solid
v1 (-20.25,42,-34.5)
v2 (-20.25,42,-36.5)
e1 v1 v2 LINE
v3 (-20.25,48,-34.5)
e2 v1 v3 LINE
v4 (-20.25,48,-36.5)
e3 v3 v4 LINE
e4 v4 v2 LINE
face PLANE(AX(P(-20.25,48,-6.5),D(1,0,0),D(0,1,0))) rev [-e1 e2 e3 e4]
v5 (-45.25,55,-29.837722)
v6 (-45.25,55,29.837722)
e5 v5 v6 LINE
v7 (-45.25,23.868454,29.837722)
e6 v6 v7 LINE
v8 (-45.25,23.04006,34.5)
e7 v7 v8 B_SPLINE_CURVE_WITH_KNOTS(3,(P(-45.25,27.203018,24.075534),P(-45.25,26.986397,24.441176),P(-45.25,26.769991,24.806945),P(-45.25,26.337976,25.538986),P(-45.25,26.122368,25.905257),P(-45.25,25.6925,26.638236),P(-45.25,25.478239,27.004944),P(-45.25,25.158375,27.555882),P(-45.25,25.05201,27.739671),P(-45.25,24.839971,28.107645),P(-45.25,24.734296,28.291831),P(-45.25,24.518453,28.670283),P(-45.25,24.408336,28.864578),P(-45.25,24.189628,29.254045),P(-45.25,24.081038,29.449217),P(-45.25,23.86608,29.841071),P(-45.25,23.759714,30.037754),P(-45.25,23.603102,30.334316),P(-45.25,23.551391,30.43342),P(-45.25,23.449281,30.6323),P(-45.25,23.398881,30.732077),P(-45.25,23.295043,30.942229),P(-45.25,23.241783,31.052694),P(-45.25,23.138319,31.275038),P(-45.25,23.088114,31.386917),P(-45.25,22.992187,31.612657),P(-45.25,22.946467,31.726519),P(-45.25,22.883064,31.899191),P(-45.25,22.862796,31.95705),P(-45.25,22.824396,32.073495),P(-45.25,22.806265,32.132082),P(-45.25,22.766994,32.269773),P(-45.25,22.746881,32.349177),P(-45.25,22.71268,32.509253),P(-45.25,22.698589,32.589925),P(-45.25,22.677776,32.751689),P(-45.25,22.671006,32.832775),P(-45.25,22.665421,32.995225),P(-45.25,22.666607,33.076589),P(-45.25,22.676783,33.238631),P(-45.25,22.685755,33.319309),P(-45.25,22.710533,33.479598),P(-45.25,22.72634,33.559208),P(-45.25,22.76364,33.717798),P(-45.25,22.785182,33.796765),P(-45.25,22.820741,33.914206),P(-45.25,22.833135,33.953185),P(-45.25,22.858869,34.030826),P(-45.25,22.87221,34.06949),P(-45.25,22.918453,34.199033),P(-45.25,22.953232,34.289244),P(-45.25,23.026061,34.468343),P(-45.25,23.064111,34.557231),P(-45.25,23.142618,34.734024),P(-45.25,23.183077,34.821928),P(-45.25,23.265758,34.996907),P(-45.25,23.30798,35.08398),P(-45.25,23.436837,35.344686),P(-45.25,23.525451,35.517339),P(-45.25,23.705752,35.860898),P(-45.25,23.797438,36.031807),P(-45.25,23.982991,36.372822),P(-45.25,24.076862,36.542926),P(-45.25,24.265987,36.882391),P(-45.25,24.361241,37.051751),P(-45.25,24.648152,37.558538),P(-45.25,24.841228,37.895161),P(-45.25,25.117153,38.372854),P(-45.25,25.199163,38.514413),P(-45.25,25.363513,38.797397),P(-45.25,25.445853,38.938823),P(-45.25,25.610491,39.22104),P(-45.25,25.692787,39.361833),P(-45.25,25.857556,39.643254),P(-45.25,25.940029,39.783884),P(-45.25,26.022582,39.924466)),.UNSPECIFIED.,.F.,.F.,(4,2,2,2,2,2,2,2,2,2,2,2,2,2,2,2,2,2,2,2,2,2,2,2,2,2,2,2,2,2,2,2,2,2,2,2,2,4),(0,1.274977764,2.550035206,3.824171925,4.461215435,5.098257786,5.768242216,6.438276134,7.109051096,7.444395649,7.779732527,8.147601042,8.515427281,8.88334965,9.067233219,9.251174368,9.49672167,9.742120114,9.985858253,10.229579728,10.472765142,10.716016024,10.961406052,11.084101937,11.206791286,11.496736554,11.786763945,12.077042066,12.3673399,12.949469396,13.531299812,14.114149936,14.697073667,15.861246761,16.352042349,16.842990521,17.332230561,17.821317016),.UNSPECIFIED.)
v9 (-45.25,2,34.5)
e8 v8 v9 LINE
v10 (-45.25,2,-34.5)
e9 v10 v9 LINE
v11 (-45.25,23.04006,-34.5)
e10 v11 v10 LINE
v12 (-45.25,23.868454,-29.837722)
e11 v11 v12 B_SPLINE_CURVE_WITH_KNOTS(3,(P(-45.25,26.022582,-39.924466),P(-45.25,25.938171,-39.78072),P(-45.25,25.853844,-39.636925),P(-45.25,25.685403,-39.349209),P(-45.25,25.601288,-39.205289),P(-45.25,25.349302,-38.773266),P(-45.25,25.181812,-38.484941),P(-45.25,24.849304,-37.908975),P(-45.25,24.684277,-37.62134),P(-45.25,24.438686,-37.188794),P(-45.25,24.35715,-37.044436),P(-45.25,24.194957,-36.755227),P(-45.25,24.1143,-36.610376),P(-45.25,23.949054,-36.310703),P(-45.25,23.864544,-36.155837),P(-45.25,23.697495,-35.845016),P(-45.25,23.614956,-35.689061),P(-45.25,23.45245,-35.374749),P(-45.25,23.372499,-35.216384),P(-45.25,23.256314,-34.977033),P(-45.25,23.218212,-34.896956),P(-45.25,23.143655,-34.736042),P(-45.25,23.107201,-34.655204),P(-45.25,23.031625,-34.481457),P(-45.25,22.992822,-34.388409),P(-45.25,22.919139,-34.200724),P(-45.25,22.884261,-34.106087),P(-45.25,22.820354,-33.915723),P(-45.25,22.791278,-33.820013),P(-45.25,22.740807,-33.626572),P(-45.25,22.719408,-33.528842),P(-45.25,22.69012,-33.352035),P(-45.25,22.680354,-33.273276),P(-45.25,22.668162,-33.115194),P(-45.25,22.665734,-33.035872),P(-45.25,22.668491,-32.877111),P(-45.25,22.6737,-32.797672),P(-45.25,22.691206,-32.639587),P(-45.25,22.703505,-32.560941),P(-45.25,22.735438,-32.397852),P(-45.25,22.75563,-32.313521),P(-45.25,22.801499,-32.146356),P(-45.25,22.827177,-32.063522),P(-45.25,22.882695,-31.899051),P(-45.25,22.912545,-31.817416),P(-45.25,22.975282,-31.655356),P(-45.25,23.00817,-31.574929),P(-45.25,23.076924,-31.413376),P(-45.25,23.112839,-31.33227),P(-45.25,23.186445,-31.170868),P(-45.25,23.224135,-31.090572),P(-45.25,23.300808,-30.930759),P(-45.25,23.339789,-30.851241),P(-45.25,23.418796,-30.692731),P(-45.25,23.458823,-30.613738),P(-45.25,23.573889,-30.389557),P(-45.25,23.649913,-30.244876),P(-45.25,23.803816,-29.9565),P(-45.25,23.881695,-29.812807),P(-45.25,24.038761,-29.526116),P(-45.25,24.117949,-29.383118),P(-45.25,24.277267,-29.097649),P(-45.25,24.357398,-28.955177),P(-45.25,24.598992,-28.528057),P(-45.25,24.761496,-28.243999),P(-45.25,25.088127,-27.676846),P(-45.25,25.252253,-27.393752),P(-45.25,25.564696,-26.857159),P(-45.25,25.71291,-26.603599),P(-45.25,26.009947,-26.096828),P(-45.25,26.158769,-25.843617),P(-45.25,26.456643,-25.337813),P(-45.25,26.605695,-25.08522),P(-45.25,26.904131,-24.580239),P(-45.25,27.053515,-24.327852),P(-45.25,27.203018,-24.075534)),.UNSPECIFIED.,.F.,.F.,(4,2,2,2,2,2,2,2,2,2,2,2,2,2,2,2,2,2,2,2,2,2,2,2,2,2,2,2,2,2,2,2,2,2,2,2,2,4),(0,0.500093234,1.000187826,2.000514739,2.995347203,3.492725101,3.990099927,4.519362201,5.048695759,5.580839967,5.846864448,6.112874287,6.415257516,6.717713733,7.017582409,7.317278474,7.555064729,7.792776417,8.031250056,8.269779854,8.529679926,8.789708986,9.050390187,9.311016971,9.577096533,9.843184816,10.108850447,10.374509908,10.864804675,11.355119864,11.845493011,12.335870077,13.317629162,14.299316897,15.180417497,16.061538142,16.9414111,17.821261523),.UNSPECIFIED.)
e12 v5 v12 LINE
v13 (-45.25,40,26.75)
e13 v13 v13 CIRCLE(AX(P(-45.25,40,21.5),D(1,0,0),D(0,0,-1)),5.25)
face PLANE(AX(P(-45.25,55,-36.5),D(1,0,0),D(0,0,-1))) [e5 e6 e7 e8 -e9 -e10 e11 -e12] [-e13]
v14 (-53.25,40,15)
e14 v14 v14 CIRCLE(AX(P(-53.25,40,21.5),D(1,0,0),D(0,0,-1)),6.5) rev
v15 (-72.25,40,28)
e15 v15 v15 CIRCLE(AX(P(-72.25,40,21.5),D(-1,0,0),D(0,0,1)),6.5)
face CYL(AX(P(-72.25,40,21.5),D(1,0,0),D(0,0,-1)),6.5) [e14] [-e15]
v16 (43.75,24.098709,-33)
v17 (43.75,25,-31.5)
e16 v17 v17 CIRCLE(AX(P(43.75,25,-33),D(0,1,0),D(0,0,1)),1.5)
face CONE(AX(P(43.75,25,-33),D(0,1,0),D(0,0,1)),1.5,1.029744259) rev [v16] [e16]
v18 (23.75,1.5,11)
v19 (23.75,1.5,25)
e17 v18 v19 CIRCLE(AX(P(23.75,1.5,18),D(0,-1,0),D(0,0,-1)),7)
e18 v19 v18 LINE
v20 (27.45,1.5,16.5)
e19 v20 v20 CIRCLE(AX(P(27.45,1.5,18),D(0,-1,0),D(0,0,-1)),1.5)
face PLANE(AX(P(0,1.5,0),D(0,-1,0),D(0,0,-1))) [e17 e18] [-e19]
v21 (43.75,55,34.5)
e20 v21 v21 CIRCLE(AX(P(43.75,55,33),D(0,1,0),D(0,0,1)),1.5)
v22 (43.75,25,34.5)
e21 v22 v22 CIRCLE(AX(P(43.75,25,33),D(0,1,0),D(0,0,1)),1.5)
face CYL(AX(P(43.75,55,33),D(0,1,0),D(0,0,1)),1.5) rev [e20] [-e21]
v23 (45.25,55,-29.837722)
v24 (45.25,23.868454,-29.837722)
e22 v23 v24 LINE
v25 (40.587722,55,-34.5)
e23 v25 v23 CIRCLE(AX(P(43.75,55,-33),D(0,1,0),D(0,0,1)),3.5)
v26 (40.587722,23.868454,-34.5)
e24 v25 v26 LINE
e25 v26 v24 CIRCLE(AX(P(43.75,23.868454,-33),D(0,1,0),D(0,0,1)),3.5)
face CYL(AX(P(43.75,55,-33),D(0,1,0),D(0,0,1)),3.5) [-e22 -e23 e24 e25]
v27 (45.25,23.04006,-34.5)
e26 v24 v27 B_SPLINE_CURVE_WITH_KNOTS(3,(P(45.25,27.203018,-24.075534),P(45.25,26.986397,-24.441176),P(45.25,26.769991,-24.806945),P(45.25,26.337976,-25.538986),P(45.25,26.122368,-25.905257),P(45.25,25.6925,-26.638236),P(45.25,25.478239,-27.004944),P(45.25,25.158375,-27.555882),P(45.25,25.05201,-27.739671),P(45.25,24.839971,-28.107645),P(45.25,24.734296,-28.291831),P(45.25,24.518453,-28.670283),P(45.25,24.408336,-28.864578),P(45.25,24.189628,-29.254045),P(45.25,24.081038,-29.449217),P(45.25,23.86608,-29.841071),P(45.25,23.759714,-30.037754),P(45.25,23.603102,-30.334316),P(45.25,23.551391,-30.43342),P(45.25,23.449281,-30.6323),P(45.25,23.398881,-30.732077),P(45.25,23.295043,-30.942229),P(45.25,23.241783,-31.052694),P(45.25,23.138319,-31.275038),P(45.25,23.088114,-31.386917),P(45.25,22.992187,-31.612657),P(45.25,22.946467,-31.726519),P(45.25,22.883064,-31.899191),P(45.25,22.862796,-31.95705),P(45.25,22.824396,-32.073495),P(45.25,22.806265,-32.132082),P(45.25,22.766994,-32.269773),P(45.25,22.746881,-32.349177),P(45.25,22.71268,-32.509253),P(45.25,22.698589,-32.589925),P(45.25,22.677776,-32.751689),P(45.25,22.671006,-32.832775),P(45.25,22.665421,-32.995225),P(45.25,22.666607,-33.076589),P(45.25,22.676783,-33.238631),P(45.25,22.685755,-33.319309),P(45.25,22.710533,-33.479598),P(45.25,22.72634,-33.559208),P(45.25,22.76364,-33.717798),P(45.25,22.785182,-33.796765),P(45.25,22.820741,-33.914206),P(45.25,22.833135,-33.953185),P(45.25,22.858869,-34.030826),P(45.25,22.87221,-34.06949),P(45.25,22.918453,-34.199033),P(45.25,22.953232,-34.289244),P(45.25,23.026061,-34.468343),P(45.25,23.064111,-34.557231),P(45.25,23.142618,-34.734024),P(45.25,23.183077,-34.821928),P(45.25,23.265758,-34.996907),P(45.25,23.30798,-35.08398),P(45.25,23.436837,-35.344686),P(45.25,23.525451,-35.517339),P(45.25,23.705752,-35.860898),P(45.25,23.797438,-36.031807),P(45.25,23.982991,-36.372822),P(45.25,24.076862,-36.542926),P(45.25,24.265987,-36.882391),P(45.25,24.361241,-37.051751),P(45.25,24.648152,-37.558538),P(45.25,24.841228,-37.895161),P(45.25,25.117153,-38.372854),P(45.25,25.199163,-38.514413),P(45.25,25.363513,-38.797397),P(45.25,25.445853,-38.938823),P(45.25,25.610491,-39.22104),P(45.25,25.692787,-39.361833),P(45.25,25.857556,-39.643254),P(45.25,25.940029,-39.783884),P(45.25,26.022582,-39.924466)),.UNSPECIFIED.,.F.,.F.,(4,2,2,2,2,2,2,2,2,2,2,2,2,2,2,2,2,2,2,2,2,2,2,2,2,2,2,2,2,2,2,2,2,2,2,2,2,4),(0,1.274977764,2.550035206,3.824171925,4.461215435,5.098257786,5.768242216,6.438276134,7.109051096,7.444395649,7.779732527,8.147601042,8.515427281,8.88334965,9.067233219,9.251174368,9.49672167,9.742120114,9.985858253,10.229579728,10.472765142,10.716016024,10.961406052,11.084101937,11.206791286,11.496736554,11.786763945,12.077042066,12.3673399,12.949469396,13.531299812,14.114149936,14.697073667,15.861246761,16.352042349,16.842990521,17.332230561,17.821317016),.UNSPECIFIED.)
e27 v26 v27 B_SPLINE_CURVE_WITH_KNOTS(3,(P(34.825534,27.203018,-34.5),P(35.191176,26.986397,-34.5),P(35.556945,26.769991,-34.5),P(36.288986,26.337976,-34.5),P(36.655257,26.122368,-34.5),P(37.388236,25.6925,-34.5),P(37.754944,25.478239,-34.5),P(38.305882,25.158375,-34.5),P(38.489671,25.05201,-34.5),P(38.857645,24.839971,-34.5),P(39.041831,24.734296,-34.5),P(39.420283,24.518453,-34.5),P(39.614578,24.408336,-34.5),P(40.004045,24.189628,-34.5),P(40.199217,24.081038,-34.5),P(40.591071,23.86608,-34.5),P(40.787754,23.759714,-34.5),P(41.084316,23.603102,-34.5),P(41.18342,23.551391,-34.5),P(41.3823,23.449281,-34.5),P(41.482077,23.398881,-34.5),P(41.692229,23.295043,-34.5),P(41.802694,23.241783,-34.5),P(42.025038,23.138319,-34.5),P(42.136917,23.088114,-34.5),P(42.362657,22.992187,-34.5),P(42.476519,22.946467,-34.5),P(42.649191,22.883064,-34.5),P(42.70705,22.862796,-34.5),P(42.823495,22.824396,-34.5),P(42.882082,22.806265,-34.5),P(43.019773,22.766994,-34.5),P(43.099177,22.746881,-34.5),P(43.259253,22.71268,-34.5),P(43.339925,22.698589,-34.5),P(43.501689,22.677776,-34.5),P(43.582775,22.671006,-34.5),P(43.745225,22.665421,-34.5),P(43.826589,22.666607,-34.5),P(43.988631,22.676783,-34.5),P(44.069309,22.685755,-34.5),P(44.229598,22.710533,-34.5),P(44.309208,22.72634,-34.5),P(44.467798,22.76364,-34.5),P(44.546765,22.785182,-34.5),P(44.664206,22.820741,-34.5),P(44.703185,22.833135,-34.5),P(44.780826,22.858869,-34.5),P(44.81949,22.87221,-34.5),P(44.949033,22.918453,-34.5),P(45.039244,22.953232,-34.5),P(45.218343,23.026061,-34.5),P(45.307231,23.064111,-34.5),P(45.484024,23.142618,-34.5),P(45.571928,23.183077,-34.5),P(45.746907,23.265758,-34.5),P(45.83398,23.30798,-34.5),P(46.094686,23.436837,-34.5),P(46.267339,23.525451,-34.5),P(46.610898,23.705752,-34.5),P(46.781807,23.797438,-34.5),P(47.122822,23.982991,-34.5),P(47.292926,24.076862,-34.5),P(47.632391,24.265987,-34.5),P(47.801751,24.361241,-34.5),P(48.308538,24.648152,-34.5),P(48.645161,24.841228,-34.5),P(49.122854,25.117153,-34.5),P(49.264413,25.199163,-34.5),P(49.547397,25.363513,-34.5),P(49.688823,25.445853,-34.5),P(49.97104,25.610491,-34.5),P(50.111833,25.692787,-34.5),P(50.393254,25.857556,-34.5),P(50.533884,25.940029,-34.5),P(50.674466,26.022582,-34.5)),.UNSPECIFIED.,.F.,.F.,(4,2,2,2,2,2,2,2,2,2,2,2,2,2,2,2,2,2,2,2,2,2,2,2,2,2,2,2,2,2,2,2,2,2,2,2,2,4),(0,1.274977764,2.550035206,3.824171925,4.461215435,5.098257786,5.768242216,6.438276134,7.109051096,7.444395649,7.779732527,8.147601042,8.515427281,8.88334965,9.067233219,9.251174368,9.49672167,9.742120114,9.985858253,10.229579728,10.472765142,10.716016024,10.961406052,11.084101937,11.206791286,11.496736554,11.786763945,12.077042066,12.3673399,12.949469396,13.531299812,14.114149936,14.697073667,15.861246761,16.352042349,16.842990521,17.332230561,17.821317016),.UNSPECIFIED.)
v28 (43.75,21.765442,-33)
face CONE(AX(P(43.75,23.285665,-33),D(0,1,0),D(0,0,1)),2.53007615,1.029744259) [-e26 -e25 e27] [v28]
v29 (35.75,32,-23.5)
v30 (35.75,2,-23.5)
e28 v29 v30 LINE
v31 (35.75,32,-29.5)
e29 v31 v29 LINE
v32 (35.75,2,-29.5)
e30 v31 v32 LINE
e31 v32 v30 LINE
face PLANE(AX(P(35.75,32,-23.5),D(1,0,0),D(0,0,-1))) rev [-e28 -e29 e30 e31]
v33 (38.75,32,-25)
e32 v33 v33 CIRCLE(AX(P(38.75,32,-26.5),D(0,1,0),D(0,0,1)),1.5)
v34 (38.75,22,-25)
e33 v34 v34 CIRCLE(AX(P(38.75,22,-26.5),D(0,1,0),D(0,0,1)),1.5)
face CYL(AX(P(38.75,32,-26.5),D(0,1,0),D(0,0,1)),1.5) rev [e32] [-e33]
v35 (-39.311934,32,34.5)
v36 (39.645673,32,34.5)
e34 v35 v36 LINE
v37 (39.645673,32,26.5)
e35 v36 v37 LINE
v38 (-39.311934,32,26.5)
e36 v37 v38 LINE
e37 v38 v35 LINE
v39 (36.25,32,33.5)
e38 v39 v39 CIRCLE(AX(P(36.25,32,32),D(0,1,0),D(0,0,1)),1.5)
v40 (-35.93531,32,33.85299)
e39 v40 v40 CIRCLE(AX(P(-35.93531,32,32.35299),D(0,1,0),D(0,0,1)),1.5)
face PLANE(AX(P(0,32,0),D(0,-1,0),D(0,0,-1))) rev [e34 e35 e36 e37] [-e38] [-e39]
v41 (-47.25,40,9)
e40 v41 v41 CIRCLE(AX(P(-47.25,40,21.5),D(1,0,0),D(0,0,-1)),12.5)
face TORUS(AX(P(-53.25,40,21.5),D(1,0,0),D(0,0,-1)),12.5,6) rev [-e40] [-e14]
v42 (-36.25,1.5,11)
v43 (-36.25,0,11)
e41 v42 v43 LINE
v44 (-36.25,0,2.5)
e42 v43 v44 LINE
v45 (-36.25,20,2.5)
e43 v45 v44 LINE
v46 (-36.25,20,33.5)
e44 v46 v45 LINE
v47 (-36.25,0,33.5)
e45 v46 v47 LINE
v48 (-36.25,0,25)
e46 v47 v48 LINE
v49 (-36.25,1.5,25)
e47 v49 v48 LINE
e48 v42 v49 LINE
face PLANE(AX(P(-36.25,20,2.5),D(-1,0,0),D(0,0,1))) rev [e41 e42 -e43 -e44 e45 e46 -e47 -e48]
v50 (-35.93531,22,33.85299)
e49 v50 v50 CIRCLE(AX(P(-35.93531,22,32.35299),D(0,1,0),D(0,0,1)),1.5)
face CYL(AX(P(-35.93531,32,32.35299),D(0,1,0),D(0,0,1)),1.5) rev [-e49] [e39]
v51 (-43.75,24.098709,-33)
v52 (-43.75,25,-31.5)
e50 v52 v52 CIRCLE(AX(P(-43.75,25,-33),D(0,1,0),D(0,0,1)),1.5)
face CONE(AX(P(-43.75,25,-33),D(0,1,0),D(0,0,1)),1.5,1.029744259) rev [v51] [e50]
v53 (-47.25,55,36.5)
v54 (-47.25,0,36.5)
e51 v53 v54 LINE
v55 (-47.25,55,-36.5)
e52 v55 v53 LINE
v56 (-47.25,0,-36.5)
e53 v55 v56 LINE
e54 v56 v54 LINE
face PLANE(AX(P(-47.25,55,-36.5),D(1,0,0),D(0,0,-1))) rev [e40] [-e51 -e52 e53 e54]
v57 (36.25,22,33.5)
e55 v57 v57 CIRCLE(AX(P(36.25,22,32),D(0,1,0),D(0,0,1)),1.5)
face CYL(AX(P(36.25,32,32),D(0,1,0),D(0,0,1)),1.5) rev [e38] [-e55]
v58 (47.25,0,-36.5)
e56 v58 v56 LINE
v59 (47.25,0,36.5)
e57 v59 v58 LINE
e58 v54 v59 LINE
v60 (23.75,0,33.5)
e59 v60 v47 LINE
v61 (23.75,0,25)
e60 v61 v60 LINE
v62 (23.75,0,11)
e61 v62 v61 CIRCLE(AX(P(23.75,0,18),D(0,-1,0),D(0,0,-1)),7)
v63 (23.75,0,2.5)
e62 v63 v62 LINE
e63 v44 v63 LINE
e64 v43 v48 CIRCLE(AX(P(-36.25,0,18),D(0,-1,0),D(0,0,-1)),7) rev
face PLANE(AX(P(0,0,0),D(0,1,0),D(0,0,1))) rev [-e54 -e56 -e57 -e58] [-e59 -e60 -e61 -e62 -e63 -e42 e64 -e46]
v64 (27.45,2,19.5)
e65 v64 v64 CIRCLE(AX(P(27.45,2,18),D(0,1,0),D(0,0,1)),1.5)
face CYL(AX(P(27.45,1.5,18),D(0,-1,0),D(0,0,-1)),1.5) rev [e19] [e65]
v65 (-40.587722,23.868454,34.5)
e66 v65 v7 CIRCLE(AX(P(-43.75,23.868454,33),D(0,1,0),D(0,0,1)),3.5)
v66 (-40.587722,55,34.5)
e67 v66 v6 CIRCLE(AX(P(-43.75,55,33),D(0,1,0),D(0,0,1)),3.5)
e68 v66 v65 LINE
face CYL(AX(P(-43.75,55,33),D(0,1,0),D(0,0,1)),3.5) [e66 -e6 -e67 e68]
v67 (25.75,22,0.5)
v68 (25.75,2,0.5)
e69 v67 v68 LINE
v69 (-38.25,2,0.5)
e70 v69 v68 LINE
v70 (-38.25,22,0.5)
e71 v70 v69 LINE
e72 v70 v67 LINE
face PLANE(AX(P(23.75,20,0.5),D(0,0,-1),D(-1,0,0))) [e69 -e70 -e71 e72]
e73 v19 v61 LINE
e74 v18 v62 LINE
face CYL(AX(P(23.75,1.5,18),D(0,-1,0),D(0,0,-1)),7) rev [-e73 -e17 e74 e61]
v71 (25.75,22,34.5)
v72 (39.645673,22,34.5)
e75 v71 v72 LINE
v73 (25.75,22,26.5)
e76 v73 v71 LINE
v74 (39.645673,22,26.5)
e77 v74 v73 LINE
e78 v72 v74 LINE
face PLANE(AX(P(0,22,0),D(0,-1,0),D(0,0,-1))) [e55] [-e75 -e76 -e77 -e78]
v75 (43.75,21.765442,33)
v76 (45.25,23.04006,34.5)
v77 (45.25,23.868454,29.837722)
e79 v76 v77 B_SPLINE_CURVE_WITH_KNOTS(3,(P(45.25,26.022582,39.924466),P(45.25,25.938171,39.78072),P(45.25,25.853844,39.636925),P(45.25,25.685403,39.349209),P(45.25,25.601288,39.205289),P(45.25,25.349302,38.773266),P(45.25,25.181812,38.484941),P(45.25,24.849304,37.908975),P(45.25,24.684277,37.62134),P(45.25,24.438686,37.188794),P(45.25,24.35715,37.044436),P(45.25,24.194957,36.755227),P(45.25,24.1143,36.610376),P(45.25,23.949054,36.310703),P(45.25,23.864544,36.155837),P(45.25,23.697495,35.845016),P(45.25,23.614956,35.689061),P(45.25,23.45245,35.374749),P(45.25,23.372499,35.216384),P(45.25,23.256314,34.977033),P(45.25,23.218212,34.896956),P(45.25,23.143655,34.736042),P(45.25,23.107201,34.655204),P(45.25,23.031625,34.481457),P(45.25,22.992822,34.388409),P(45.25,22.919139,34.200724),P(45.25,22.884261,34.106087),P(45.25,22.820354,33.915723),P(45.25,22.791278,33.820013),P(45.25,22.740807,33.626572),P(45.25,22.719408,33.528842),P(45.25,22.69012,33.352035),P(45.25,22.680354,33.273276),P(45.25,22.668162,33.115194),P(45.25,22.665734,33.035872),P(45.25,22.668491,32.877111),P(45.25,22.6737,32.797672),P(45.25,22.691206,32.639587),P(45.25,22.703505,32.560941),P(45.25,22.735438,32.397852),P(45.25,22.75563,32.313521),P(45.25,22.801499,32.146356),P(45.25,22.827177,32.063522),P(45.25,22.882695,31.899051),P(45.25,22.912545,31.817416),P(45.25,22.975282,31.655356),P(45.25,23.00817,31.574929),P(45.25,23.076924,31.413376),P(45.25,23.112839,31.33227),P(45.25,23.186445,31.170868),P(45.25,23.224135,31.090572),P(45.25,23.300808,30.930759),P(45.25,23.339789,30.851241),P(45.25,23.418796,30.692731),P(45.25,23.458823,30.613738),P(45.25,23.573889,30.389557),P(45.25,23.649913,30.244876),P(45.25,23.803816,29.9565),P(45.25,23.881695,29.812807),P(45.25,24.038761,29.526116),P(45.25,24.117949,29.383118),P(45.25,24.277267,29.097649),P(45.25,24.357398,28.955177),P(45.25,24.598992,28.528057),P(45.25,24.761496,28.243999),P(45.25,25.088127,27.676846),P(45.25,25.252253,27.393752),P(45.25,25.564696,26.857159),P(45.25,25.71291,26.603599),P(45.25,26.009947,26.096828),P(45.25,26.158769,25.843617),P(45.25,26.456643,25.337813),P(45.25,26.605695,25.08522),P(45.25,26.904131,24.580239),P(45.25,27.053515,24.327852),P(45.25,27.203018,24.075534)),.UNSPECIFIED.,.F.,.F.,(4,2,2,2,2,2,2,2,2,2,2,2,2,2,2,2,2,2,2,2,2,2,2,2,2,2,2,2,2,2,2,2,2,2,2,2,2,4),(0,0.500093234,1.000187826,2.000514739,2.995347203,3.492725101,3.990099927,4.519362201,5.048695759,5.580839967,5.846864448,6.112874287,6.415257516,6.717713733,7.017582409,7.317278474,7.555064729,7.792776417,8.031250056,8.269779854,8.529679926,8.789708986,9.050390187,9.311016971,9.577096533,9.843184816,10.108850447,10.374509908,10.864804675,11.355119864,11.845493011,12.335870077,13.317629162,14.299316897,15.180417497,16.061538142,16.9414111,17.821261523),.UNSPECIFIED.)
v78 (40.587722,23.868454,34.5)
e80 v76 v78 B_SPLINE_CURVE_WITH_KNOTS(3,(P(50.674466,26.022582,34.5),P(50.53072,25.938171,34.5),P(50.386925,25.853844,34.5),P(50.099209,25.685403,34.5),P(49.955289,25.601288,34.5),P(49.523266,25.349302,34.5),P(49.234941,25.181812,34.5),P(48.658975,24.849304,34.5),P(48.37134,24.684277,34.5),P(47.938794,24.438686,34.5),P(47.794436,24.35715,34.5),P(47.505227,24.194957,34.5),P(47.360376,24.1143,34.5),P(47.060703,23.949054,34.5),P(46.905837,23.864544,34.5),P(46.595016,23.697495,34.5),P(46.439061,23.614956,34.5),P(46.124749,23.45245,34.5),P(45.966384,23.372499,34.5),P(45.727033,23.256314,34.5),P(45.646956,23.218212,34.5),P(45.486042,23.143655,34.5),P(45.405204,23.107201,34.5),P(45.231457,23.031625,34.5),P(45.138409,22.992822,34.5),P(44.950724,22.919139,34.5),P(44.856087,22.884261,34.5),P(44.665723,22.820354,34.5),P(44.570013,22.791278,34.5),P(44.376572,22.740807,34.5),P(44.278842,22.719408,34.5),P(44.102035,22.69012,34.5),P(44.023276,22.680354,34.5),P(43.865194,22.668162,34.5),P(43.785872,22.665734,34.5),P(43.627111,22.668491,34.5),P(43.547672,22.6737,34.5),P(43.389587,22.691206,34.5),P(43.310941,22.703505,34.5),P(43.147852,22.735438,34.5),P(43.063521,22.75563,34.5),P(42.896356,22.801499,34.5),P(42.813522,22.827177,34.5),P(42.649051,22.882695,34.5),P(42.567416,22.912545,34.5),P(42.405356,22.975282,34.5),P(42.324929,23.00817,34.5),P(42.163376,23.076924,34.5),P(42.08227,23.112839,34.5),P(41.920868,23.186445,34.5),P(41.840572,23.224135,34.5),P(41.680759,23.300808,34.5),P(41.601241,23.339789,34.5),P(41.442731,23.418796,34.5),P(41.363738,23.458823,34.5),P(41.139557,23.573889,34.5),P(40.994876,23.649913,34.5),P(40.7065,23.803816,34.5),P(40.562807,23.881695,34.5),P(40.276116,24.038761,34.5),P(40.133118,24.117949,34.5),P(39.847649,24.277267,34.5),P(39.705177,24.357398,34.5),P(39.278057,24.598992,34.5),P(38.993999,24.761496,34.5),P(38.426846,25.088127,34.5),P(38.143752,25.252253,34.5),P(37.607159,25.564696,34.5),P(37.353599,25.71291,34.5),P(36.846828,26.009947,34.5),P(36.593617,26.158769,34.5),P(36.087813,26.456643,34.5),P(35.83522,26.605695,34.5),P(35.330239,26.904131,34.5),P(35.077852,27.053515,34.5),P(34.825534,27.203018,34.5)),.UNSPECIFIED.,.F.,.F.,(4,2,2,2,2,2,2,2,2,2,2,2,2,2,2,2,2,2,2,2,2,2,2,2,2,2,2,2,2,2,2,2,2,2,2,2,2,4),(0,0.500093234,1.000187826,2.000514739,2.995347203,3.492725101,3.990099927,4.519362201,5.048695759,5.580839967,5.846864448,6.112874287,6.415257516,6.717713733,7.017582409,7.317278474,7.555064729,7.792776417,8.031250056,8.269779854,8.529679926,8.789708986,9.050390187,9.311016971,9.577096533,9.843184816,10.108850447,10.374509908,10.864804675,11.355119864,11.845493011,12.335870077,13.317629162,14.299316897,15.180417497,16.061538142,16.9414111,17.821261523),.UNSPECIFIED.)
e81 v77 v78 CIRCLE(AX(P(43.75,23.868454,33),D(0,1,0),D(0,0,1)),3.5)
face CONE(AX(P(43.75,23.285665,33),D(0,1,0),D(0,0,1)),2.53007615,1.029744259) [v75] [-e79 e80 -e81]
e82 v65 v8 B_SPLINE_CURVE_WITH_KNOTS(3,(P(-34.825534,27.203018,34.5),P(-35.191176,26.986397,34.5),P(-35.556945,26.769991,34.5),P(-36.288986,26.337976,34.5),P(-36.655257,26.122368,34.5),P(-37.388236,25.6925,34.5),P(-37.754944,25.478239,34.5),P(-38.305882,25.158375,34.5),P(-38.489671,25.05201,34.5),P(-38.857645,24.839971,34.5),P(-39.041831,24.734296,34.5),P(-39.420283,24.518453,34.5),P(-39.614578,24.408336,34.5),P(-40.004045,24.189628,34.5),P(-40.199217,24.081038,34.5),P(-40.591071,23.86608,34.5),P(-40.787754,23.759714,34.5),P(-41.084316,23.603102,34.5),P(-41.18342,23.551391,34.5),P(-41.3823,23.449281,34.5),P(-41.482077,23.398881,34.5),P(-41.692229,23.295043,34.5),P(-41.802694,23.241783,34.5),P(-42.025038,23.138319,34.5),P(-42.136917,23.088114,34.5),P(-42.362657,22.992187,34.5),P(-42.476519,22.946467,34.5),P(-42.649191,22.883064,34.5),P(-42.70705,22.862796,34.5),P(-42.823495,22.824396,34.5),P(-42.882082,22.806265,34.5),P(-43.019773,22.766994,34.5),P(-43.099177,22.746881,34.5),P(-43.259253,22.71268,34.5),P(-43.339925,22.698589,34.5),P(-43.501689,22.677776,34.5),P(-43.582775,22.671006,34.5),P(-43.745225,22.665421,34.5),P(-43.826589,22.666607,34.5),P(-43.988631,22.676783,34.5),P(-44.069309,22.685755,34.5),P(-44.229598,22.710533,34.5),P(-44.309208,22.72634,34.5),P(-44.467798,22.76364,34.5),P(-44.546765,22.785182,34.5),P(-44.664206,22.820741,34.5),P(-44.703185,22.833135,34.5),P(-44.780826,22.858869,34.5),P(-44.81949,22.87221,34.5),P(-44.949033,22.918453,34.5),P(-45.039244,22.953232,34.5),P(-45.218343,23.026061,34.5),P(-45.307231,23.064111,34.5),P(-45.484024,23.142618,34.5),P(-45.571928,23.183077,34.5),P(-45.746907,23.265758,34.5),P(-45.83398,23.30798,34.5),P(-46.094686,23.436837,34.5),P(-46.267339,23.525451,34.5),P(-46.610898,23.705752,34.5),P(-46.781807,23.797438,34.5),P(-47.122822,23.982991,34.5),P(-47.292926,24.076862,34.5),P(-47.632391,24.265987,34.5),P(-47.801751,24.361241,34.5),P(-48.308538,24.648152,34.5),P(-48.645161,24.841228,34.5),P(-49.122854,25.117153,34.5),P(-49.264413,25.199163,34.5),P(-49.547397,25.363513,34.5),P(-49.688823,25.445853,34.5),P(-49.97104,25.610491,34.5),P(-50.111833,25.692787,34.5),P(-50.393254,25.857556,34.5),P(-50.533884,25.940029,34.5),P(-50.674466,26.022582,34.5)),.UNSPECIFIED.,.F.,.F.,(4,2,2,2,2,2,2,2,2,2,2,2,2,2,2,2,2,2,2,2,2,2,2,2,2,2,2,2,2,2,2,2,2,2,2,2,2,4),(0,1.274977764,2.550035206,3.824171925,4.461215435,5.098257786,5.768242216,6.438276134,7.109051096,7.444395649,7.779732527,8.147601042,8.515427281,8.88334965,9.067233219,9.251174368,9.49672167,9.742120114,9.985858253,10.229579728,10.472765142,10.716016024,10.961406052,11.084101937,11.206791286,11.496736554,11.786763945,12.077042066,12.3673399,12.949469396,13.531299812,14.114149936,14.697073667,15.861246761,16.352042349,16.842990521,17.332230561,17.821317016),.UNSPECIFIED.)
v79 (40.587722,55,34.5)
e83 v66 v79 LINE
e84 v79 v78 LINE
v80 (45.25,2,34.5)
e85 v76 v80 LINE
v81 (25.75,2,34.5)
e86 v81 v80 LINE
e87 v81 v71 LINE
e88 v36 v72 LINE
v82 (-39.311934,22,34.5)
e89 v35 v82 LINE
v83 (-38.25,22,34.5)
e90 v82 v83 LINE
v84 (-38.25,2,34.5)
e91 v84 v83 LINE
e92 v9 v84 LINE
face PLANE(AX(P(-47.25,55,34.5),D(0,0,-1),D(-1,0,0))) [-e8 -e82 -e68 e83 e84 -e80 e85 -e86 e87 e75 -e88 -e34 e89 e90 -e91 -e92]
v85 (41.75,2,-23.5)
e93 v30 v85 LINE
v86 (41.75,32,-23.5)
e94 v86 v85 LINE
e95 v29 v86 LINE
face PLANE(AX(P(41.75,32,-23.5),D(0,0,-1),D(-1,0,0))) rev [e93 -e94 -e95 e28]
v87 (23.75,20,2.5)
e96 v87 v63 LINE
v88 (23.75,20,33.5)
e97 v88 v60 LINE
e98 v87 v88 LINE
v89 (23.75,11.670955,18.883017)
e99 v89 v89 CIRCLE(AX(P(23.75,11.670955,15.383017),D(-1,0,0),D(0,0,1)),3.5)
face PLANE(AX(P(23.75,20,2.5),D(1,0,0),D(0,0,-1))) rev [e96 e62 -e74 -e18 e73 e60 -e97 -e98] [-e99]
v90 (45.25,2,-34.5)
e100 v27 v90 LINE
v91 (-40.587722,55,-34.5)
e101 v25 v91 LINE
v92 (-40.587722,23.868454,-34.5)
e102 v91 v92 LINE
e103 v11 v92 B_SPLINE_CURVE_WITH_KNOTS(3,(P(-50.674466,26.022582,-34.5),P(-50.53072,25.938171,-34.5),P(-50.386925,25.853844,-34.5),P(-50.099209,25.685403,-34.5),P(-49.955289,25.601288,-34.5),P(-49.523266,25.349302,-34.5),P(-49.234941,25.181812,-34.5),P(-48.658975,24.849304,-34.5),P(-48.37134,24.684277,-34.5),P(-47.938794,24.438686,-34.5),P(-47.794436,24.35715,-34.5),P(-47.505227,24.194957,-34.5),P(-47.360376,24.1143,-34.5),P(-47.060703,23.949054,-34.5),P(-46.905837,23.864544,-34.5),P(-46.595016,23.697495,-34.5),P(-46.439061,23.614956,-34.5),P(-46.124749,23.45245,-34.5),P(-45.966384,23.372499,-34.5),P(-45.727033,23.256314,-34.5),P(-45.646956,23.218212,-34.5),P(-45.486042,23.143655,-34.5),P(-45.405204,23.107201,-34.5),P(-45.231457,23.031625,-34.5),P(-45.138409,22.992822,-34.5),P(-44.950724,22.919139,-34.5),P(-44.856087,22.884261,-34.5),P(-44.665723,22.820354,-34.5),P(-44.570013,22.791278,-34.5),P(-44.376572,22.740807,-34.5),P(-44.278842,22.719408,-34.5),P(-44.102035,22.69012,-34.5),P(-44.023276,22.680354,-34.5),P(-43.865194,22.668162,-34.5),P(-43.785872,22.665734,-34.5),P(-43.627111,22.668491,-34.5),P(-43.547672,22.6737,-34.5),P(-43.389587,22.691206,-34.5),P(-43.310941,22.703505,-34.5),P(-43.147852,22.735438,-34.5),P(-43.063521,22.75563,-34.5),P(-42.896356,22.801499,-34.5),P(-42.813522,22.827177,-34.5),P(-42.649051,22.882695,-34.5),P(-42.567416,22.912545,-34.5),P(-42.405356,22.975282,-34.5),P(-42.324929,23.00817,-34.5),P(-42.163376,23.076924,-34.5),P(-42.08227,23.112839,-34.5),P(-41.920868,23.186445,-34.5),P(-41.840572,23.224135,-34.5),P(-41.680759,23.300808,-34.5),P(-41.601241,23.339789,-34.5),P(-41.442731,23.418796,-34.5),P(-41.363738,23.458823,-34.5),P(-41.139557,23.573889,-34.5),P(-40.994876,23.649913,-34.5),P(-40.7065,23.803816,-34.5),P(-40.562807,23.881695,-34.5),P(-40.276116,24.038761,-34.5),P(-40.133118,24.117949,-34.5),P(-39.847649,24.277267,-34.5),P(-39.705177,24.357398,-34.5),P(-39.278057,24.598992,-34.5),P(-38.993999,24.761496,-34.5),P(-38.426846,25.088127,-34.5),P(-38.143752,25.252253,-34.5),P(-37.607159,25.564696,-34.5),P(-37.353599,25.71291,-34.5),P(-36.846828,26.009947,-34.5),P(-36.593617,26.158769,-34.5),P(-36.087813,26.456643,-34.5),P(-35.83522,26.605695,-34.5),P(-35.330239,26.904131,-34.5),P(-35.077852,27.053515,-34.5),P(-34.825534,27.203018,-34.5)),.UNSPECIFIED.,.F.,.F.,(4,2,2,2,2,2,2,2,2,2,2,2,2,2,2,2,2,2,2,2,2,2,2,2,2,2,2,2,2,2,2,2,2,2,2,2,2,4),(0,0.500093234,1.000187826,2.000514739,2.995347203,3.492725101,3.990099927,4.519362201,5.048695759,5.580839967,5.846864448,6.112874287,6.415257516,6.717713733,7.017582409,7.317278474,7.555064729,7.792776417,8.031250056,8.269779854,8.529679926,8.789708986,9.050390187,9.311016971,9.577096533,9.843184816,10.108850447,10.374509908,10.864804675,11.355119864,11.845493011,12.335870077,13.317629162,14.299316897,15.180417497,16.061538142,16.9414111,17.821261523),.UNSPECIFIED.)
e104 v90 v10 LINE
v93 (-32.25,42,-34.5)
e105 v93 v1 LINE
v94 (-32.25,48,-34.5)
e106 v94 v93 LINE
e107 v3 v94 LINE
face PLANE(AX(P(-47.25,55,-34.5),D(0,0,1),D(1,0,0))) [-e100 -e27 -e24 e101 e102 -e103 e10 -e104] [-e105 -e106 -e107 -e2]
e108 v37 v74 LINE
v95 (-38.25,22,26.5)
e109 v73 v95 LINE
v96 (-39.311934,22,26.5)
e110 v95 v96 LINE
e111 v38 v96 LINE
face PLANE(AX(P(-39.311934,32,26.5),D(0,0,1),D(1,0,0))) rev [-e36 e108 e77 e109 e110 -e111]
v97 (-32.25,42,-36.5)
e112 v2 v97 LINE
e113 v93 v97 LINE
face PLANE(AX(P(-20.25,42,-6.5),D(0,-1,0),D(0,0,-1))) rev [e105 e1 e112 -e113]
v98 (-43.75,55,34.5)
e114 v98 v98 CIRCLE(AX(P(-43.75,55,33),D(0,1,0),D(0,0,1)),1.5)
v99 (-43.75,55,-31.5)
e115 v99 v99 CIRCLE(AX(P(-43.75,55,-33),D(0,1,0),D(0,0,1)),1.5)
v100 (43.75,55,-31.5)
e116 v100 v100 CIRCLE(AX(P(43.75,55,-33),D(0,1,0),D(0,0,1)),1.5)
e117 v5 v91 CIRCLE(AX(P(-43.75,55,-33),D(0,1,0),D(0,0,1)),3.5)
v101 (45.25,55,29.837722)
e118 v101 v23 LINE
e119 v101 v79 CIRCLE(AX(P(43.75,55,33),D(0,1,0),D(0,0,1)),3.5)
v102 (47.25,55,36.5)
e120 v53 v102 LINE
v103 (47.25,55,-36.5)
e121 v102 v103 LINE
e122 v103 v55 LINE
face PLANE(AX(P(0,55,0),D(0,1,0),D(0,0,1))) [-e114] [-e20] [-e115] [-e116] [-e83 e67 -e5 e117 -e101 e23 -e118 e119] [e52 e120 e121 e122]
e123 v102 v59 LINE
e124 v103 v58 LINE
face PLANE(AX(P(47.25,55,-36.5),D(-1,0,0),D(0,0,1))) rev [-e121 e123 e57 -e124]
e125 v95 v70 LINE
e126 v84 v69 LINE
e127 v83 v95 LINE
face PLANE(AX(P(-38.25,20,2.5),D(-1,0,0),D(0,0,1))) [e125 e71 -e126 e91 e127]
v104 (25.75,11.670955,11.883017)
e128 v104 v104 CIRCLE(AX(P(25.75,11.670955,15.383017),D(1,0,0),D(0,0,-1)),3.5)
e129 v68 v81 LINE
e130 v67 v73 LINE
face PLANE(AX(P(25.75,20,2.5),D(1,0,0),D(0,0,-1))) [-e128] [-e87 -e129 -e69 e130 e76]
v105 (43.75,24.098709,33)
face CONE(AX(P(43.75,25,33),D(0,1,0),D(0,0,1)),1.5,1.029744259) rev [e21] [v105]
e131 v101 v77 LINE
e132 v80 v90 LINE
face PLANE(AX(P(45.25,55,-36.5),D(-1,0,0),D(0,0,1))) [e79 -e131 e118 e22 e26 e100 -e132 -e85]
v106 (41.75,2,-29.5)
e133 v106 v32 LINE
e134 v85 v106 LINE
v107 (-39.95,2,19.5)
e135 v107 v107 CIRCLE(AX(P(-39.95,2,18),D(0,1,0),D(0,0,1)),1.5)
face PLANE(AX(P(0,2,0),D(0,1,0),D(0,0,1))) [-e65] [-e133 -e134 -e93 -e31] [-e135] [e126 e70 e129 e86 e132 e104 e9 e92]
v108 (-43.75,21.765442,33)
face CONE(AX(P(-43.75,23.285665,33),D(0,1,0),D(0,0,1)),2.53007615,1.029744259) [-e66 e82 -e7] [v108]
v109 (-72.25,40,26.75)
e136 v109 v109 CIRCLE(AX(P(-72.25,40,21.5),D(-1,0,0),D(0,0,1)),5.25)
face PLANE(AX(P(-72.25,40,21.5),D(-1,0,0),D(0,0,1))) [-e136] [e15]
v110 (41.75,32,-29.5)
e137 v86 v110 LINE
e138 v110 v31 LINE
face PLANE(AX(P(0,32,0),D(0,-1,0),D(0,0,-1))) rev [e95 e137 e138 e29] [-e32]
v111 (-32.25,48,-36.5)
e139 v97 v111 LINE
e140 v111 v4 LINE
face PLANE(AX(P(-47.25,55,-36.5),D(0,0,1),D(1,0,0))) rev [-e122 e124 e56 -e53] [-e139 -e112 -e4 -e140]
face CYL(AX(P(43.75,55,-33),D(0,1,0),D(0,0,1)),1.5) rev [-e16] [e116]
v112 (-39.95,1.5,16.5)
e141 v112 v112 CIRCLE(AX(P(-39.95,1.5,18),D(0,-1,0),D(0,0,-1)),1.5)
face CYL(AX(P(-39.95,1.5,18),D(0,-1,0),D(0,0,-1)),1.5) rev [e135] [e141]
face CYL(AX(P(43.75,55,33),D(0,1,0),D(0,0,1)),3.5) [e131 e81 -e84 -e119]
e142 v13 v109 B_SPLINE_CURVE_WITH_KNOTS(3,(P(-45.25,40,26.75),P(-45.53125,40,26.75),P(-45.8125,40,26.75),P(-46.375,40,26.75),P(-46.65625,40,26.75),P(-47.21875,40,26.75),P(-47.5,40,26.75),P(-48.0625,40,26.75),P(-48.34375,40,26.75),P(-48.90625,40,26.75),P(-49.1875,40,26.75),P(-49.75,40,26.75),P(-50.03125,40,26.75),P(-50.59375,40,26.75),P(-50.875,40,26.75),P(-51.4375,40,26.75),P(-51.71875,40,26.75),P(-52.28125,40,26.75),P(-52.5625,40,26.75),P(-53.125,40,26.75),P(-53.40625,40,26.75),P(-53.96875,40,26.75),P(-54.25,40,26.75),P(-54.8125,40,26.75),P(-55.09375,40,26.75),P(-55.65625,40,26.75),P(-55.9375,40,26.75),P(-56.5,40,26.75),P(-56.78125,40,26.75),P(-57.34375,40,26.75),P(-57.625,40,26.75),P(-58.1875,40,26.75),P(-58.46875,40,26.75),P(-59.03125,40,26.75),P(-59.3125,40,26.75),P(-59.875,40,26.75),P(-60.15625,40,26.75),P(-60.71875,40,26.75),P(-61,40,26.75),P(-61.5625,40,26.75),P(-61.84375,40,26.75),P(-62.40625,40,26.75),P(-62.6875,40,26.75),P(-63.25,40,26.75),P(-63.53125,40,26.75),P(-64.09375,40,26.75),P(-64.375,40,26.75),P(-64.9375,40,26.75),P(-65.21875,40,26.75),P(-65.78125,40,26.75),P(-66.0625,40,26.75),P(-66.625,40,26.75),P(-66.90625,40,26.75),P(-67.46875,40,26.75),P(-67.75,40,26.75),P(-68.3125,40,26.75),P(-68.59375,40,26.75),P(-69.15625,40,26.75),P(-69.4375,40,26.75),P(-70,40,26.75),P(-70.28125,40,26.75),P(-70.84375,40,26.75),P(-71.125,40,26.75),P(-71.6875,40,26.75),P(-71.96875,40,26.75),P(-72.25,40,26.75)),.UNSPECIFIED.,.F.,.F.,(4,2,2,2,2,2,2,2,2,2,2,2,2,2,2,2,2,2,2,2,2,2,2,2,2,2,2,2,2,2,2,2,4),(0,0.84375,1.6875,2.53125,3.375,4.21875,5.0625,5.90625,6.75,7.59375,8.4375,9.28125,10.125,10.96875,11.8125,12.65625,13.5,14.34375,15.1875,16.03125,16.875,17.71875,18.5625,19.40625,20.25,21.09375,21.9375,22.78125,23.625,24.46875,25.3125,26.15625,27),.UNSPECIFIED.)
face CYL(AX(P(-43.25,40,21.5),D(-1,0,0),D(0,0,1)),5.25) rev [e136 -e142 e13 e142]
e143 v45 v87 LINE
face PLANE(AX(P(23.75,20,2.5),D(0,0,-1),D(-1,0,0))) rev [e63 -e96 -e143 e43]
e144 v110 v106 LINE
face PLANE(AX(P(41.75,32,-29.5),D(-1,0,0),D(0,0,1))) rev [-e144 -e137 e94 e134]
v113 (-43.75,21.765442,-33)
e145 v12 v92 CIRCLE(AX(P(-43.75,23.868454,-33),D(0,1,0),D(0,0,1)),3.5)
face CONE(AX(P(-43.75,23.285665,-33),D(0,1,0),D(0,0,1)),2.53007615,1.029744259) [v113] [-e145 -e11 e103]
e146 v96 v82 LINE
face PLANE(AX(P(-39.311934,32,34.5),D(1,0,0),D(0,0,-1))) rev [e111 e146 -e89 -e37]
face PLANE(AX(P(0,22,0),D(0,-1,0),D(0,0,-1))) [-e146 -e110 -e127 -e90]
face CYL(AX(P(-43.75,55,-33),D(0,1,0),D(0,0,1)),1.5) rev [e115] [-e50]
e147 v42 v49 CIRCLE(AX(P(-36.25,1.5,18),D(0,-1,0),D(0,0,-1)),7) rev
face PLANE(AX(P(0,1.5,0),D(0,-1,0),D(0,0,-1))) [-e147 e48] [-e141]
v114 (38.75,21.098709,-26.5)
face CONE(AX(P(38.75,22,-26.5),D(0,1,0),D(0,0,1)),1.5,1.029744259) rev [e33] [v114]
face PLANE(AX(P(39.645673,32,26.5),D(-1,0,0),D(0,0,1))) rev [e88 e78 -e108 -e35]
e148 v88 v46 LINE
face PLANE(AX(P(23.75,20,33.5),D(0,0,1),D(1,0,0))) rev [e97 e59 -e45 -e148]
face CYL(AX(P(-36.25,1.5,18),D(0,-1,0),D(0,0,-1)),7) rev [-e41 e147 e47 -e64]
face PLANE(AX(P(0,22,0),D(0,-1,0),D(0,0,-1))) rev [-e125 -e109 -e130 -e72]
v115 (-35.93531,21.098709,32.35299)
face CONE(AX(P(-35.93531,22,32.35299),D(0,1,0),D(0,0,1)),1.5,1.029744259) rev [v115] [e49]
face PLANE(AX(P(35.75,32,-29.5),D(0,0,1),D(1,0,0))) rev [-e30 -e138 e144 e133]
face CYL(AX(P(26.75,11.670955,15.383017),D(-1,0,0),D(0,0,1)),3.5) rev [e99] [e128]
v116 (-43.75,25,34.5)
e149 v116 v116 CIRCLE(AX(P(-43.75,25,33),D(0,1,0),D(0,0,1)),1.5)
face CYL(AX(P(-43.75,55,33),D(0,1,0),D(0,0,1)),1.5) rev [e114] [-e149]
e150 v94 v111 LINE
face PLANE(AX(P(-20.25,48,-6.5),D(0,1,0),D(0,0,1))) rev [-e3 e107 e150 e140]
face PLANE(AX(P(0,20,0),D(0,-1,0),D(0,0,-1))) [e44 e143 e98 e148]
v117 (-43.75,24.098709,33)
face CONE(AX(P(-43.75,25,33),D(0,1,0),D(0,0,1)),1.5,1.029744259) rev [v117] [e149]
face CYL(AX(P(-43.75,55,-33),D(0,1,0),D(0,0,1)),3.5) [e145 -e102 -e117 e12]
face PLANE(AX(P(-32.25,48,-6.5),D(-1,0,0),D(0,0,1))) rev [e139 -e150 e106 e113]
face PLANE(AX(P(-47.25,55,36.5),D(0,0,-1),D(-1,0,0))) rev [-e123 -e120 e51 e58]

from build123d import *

# Parameters (mm, degrees)
SKETCH1_W                 = 94.5
SKETCH1_H                 = 73
BOSS_EXTRUDE1_DEPTH       = 55
F_3_0MM_DOWEL_HOLE1_D     = 3
F_3_0MM_DOWEL_HOLE1_DEPTH = 30
F_3_0MM_DOWEL_HOLE1_TIP   = 0.901290929
SKETCH7_W                 = 60
SKETCH7_H                 = 31
CUT_EXTRUDE2_DEPTH        = 20
SHELL2_START              = 2
SHELL2_DEPTH              = 53
SHELL2_START_2            = 22
SHELL2_2_OUTLINE_W        = 64
SHELL2_2_OUTLINE_H        = 34
SHELL2_2_DEPTH            = 33
SHELL2_3_DEPTH            = 21.868454444
CUT_EXTRUDE3_DEPTH        = 1.5
F_3_0MM_DOWEL_HOLE3_D     = 3
SKETCH15_R                = 3.5
CUT_EXTRUDE4_DEPTH        = 3
SKETCH20_W                = 78.95760637
SKETCH20_H                = 8
BOSS_EXTRUDE2_DEPTH       = 10
SKETCH21_W                = 6
SKETCH21_H                = 6
BOSS_EXTRUDE3_DEPTH       = 30
F_3_0MM_DOWEL_HOLE5_D     = 3
F_3_0MM_DOWEL_HOLE5_DEPTH = 10
F_3_0MM_DOWEL_HOLE5_TIP   = 0.901290929
F_3_0MM_DOWEL_HOLE6_D     = 3
F_3_0MM_DOWEL_HOLE6_DEPTH = 10
F_3_0MM_DOWEL_HOLE6_TIP   = 0.901290929
SKETCH27_W                = 12
SKETCH27_H                = 6
CUT_EXTRUDE5_DEPTH        = 30
SKETCH28_R                = 6.5
BOSS_EXTRUDE4_DEPTH       = 25
FILLET1_R                 = 6
SKETCH29_R                = 5.25
CUT_EXTRUDE6_DEPTH        = 29


with BuildPart() as part:
    # Sketch1 → Boss-Extrude1 (new body)
    with BuildSketch(Plane(origin=(0, 0, 0), x_dir=(1, 0, 0), z_dir=(0, 1, 0))):
        Rectangle(SKETCH1_W, SKETCH1_H)
    extrude(amount=BOSS_EXTRUDE1_DEPTH)

    # Ø3.0mm Dowel Hole1
    with Locations(Plane(origin=(-43.75, 55, -33), x_dir=(0, 0, 1), z_dir=(0, 1, 0))):
        with Locations((0, 0), (0, 87.5), (66, 87.5), (66, 0)):
            Hole(F_3_0MM_DOWEL_HOLE1_D / 2, depth=F_3_0MM_DOWEL_HOLE1_DEPTH)
            with Locations((0, 0, -(F_3_0MM_DOWEL_HOLE1_DEPTH + F_3_0MM_DOWEL_HOLE1_TIP / 2))):  # 118° drill point
                Cone(0, F_3_0MM_DOWEL_HOLE1_D / 2, F_3_0MM_DOWEL_HOLE1_TIP, mode=Mode.SUBTRACT)

    # Sketch7 → Cut-Extrude2 (cut)
    with BuildSketch(Plane.XZ):
        with Locations((-6.25, 18)):
            Rectangle(SKETCH7_W, SKETCH7_H)
    extrude(amount=-CUT_EXTRUDE2_DEPTH, mode=Mode.SUBTRACT)

    # Shell2: read off the stored shape, not the designer's step
    # Shell2 outline → Shell2 (cut)
    with BuildSketch(Plane(origin=(0, 0, 0), x_dir=(1, 0, 0), z_dir=(0, 1, 0)).offset(SHELL2_START)):
        with BuildLine():
            Line((-45.25, 29.83772234), (-45.25, -29.83772234))
            ThreePointArc((-45.25, -29.83772234), (-41.275126266, -30.525126266), (-40.58772234, -34.5))
            Line((-40.58772234, -34.5), (-38.25, -34.5))
            Line((-38.25, -34.5), (-38.25, -0.5))
            Line((-38.25, -0.5), (25.75, -0.5))
            Line((25.75, -0.5), (25.75, -34.5))
            Line((25.75, -34.5), (40.58772234, -34.5))
            ThreePointArc((40.58772234, -34.5), (41.275126266, -30.525126266), (45.25, -29.83772234))
            Line((45.25, -29.83772234), (45.25, 29.83772234))
            ThreePointArc((45.25, 29.83772234), (41.275126266, 30.525126266), (40.58772234, 34.5))
            Line((40.58772234, 34.5), (-40.58772234, 34.5))
            ThreePointArc((-40.58772234, 34.5), (-41.275126266, 30.525126266), (-45.25, 29.83772234))
        make_face()
    extrude(amount=SHELL2_DEPTH, mode=Mode.SUBTRACT)

    # Shell2 2 outline → Shell2 2 (cut)
    with BuildSketch(Plane(origin=(0, 0, 0), x_dir=(1, 0, 0), z_dir=(0, 1, 0)).offset(SHELL2_START_2)):
        with Locations((-6.25, -17.5)):
            Rectangle(SHELL2_2_OUTLINE_W, SHELL2_2_OUTLINE_H)
    extrude(amount=SHELL2_2_DEPTH, mode=Mode.SUBTRACT)

    # Shell2 3 outline → Shell2 3 (cut)
    with BuildSketch(Plane(origin=(0, 0, 0), x_dir=(1, 0, 0), z_dir=(0, 1, 0)).offset(SHELL2_START)):
        with BuildLine():
            Line((-45.25, -29.83772234), (-45.25, -34.5))
            Line((-45.25, -34.5), (-40.58772234, -34.5))
            ThreePointArc((-40.58772234, -34.5), (-41.275126266, -30.525126266), (-45.25, -29.83772234))
        make_face()
        with BuildLine():
            Line((-45.25, 34.5), (-45.25, 29.83772234))
            ThreePointArc((-45.25, 29.83772234), (-41.275126266, 30.525126266), (-40.58772234, 34.5))
            Line((-40.58772234, 34.5), (-45.25, 34.5))
        make_face()
        with BuildLine():
            Line((45.25, 34.5), (40.58772234, 34.5))
            ThreePointArc((40.58772234, 34.5), (41.275126266, 30.525126266), (45.25, 29.83772234))
            Line((45.25, 29.83772234), (45.25, 34.5))
        make_face()
        with BuildLine():
            ThreePointArc((45.25, -29.83772234), (41.275126266, -30.525126266), (40.58772234, -34.5))
            Line((40.58772234, -34.5), (45.25, -34.5))
            Line((45.25, -34.5), (45.25, -29.83772234))
        make_face()
    extrude(amount=SHELL2_3_DEPTH, mode=Mode.SUBTRACT)

    # Shell2 4 outline → Shell2 4 (revolve)
    with BuildSketch(Plane(origin=(-43.75, 0, 33), x_dir=(1, 0, 0), z_dir=(0, 0, 1))):
        Polygon((0, 23.868454444), (0, 21.765442277), (3.5, 23.868454444), align=None)
    revolve(axis=Axis((-43.75, 0, 33), (0, 1, 0)))

    # Shell2 5 outline → Shell2 5 (revolve)
    with BuildSketch(Plane(origin=(43.75, 0, 33), x_dir=(1, 0, 0), z_dir=(0, 0, 1))):
        Polygon((0, 23.868454444), (0, 21.765442277), (3.5, 23.868454444), align=None)
    revolve(axis=Axis((43.75, 0, 33), (0, 1, 0)))

    # Shell2 6 outline → Shell2 6 (revolve)
    with BuildSketch(Plane(origin=(43.75, 0, -33), x_dir=(1, 0, 0), z_dir=(0, 0, 1))):
        Polygon((0, 23.868454444), (0, 21.765442277), (3.5, 23.868454444), align=None)
    revolve(axis=Axis((43.75, 0, -33), (0, 1, 0)))

    # Shell2 7 outline → Shell2 7 (revolve)
    with BuildSketch(Plane(origin=(-43.75, 0, -33), x_dir=(1, 0, 0), z_dir=(0, 0, 1))):
        Polygon((0, 23.868454444), (0, 21.765442277), (3.5, 23.868454444), align=None)
    revolve(axis=Axis((-43.75, 0, -33), (0, 1, 0)))

    # Sketch8 → Cut-Extrude3 (cut)
    with BuildSketch(Plane.XZ):
        with BuildLine():
            Line((23.75, 25), (23.75, 11))
            ThreePointArc((23.75, 11), (30.75, 18), (23.75, 25))
        make_face()
        with BuildLine():
            ThreePointArc((-36.25, 25), (-43.25, 18), (-36.25, 11))
            Line((-36.25, 11), (-36.25, 25))
        make_face()
    extrude(amount=-CUT_EXTRUDE3_DEPTH, mode=Mode.SUBTRACT)

    # Ø3.0mm Dowel Hole3 (through all)
    with Locations(Plane(origin=(27.45, 1.5, 18), x_dir=(0, 0, -1), z_dir=(0, -1, 0))):
        with Locations((0, 0), (0, -67.4)):
            Hole(F_3_0MM_DOWEL_HOLE3_D / 2)

    # Sketch15 → Cut-Extrude4 (cut)
    with BuildSketch(Plane.ZY.offset(-23.75)):
        with Locations((15.383017002, 11.670955046)):
            Circle(SKETCH15_R)
    extrude(amount=-CUT_EXTRUDE4_DEPTH, mode=Mode.SUBTRACT)

    # Sketch20 → Boss-Extrude2 (add)
    with BuildSketch(Plane(origin=(0, 22, 0), x_dir=(1, 0, 0), z_dir=(0, 1, 0))):
        with Locations((0.166869447, -30.5)):
            Rectangle(SKETCH20_W, SKETCH20_H)
    extrude(amount=BOSS_EXTRUDE2_DEPTH)

    # Sketch21 → Boss-Extrude3 (add)
    with BuildSketch(Plane(origin=(0, 2, 0), x_dir=(1, 0, 0), z_dir=(0, 1, 0))):
        with Locations((38.75, 26.5)):
            Rectangle(SKETCH21_W, SKETCH21_H)
    extrude(amount=BOSS_EXTRUDE3_DEPTH)

    # Ø3.0mm Dowel Hole5
    with Locations(Plane(origin=(0, 32, 0), x_dir=(1, 0, 0), z_dir=(0, 1, 0))):
        with Locations((36.25, -32), (-35.935310091, -32.352990413)):
            Hole(F_3_0MM_DOWEL_HOLE5_D / 2, depth=F_3_0MM_DOWEL_HOLE5_DEPTH)
            with Locations((0, 0, -(F_3_0MM_DOWEL_HOLE5_DEPTH + F_3_0MM_DOWEL_HOLE5_TIP / 2))):  # 118° drill point
                Cone(0, F_3_0MM_DOWEL_HOLE5_D / 2, F_3_0MM_DOWEL_HOLE5_TIP, mode=Mode.SUBTRACT)

    # Ø3.0mm Dowel Hole6
    with Locations(Plane(origin=(0, 32, 0), x_dir=(1, 0, 0), z_dir=(0, 1, 0))):
        with Locations((38.75, 26.5)):
            Hole(F_3_0MM_DOWEL_HOLE6_D / 2, depth=F_3_0MM_DOWEL_HOLE6_DEPTH)
            with Locations((0, 0, -(F_3_0MM_DOWEL_HOLE6_DEPTH + F_3_0MM_DOWEL_HOLE6_TIP / 2))):  # 118° drill point
                Cone(0, F_3_0MM_DOWEL_HOLE6_D / 2, F_3_0MM_DOWEL_HOLE6_TIP, mode=Mode.SUBTRACT)

    # Sketch27 → Cut-Extrude5 (cut)
    with BuildSketch(Plane(origin=(0, 0, -36.5), x_dir=(-1, 0, 0), z_dir=(0, 0, -1))):
        with Locations((26.25, 45)):
            Rectangle(SKETCH27_W, SKETCH27_H)
    extrude(amount=-CUT_EXTRUDE5_DEPTH, mode=Mode.SUBTRACT)

    # Sketch28 → Boss-Extrude4 (add)
    with BuildSketch(Plane.ZY.offset(47.25)):
        with Locations(Location((21.5, 40, 0), (0, 0, 180))):
            Circle(SKETCH28_R)
    extrude(amount=BOSS_EXTRUDE4_DEPTH)

    # Fillet1
    fillet1_edges = [part.edges().sort_by_distance(p)[0] for p in [
        (-47.25, 40, 28),
    ]]
    fillet(fillet1_edges, radius=FILLET1_R)

    # Sketch29 → Cut-Extrude6 (cut)
    with BuildSketch(Plane.ZY.offset(72.25)):
        with Locations((21.5, 40)):
            Circle(SKETCH29_R)
    extrude(amount=-CUT_EXTRUDE6_DEPTH, mode=Mode.SUBTRACT)


solid = part.part
